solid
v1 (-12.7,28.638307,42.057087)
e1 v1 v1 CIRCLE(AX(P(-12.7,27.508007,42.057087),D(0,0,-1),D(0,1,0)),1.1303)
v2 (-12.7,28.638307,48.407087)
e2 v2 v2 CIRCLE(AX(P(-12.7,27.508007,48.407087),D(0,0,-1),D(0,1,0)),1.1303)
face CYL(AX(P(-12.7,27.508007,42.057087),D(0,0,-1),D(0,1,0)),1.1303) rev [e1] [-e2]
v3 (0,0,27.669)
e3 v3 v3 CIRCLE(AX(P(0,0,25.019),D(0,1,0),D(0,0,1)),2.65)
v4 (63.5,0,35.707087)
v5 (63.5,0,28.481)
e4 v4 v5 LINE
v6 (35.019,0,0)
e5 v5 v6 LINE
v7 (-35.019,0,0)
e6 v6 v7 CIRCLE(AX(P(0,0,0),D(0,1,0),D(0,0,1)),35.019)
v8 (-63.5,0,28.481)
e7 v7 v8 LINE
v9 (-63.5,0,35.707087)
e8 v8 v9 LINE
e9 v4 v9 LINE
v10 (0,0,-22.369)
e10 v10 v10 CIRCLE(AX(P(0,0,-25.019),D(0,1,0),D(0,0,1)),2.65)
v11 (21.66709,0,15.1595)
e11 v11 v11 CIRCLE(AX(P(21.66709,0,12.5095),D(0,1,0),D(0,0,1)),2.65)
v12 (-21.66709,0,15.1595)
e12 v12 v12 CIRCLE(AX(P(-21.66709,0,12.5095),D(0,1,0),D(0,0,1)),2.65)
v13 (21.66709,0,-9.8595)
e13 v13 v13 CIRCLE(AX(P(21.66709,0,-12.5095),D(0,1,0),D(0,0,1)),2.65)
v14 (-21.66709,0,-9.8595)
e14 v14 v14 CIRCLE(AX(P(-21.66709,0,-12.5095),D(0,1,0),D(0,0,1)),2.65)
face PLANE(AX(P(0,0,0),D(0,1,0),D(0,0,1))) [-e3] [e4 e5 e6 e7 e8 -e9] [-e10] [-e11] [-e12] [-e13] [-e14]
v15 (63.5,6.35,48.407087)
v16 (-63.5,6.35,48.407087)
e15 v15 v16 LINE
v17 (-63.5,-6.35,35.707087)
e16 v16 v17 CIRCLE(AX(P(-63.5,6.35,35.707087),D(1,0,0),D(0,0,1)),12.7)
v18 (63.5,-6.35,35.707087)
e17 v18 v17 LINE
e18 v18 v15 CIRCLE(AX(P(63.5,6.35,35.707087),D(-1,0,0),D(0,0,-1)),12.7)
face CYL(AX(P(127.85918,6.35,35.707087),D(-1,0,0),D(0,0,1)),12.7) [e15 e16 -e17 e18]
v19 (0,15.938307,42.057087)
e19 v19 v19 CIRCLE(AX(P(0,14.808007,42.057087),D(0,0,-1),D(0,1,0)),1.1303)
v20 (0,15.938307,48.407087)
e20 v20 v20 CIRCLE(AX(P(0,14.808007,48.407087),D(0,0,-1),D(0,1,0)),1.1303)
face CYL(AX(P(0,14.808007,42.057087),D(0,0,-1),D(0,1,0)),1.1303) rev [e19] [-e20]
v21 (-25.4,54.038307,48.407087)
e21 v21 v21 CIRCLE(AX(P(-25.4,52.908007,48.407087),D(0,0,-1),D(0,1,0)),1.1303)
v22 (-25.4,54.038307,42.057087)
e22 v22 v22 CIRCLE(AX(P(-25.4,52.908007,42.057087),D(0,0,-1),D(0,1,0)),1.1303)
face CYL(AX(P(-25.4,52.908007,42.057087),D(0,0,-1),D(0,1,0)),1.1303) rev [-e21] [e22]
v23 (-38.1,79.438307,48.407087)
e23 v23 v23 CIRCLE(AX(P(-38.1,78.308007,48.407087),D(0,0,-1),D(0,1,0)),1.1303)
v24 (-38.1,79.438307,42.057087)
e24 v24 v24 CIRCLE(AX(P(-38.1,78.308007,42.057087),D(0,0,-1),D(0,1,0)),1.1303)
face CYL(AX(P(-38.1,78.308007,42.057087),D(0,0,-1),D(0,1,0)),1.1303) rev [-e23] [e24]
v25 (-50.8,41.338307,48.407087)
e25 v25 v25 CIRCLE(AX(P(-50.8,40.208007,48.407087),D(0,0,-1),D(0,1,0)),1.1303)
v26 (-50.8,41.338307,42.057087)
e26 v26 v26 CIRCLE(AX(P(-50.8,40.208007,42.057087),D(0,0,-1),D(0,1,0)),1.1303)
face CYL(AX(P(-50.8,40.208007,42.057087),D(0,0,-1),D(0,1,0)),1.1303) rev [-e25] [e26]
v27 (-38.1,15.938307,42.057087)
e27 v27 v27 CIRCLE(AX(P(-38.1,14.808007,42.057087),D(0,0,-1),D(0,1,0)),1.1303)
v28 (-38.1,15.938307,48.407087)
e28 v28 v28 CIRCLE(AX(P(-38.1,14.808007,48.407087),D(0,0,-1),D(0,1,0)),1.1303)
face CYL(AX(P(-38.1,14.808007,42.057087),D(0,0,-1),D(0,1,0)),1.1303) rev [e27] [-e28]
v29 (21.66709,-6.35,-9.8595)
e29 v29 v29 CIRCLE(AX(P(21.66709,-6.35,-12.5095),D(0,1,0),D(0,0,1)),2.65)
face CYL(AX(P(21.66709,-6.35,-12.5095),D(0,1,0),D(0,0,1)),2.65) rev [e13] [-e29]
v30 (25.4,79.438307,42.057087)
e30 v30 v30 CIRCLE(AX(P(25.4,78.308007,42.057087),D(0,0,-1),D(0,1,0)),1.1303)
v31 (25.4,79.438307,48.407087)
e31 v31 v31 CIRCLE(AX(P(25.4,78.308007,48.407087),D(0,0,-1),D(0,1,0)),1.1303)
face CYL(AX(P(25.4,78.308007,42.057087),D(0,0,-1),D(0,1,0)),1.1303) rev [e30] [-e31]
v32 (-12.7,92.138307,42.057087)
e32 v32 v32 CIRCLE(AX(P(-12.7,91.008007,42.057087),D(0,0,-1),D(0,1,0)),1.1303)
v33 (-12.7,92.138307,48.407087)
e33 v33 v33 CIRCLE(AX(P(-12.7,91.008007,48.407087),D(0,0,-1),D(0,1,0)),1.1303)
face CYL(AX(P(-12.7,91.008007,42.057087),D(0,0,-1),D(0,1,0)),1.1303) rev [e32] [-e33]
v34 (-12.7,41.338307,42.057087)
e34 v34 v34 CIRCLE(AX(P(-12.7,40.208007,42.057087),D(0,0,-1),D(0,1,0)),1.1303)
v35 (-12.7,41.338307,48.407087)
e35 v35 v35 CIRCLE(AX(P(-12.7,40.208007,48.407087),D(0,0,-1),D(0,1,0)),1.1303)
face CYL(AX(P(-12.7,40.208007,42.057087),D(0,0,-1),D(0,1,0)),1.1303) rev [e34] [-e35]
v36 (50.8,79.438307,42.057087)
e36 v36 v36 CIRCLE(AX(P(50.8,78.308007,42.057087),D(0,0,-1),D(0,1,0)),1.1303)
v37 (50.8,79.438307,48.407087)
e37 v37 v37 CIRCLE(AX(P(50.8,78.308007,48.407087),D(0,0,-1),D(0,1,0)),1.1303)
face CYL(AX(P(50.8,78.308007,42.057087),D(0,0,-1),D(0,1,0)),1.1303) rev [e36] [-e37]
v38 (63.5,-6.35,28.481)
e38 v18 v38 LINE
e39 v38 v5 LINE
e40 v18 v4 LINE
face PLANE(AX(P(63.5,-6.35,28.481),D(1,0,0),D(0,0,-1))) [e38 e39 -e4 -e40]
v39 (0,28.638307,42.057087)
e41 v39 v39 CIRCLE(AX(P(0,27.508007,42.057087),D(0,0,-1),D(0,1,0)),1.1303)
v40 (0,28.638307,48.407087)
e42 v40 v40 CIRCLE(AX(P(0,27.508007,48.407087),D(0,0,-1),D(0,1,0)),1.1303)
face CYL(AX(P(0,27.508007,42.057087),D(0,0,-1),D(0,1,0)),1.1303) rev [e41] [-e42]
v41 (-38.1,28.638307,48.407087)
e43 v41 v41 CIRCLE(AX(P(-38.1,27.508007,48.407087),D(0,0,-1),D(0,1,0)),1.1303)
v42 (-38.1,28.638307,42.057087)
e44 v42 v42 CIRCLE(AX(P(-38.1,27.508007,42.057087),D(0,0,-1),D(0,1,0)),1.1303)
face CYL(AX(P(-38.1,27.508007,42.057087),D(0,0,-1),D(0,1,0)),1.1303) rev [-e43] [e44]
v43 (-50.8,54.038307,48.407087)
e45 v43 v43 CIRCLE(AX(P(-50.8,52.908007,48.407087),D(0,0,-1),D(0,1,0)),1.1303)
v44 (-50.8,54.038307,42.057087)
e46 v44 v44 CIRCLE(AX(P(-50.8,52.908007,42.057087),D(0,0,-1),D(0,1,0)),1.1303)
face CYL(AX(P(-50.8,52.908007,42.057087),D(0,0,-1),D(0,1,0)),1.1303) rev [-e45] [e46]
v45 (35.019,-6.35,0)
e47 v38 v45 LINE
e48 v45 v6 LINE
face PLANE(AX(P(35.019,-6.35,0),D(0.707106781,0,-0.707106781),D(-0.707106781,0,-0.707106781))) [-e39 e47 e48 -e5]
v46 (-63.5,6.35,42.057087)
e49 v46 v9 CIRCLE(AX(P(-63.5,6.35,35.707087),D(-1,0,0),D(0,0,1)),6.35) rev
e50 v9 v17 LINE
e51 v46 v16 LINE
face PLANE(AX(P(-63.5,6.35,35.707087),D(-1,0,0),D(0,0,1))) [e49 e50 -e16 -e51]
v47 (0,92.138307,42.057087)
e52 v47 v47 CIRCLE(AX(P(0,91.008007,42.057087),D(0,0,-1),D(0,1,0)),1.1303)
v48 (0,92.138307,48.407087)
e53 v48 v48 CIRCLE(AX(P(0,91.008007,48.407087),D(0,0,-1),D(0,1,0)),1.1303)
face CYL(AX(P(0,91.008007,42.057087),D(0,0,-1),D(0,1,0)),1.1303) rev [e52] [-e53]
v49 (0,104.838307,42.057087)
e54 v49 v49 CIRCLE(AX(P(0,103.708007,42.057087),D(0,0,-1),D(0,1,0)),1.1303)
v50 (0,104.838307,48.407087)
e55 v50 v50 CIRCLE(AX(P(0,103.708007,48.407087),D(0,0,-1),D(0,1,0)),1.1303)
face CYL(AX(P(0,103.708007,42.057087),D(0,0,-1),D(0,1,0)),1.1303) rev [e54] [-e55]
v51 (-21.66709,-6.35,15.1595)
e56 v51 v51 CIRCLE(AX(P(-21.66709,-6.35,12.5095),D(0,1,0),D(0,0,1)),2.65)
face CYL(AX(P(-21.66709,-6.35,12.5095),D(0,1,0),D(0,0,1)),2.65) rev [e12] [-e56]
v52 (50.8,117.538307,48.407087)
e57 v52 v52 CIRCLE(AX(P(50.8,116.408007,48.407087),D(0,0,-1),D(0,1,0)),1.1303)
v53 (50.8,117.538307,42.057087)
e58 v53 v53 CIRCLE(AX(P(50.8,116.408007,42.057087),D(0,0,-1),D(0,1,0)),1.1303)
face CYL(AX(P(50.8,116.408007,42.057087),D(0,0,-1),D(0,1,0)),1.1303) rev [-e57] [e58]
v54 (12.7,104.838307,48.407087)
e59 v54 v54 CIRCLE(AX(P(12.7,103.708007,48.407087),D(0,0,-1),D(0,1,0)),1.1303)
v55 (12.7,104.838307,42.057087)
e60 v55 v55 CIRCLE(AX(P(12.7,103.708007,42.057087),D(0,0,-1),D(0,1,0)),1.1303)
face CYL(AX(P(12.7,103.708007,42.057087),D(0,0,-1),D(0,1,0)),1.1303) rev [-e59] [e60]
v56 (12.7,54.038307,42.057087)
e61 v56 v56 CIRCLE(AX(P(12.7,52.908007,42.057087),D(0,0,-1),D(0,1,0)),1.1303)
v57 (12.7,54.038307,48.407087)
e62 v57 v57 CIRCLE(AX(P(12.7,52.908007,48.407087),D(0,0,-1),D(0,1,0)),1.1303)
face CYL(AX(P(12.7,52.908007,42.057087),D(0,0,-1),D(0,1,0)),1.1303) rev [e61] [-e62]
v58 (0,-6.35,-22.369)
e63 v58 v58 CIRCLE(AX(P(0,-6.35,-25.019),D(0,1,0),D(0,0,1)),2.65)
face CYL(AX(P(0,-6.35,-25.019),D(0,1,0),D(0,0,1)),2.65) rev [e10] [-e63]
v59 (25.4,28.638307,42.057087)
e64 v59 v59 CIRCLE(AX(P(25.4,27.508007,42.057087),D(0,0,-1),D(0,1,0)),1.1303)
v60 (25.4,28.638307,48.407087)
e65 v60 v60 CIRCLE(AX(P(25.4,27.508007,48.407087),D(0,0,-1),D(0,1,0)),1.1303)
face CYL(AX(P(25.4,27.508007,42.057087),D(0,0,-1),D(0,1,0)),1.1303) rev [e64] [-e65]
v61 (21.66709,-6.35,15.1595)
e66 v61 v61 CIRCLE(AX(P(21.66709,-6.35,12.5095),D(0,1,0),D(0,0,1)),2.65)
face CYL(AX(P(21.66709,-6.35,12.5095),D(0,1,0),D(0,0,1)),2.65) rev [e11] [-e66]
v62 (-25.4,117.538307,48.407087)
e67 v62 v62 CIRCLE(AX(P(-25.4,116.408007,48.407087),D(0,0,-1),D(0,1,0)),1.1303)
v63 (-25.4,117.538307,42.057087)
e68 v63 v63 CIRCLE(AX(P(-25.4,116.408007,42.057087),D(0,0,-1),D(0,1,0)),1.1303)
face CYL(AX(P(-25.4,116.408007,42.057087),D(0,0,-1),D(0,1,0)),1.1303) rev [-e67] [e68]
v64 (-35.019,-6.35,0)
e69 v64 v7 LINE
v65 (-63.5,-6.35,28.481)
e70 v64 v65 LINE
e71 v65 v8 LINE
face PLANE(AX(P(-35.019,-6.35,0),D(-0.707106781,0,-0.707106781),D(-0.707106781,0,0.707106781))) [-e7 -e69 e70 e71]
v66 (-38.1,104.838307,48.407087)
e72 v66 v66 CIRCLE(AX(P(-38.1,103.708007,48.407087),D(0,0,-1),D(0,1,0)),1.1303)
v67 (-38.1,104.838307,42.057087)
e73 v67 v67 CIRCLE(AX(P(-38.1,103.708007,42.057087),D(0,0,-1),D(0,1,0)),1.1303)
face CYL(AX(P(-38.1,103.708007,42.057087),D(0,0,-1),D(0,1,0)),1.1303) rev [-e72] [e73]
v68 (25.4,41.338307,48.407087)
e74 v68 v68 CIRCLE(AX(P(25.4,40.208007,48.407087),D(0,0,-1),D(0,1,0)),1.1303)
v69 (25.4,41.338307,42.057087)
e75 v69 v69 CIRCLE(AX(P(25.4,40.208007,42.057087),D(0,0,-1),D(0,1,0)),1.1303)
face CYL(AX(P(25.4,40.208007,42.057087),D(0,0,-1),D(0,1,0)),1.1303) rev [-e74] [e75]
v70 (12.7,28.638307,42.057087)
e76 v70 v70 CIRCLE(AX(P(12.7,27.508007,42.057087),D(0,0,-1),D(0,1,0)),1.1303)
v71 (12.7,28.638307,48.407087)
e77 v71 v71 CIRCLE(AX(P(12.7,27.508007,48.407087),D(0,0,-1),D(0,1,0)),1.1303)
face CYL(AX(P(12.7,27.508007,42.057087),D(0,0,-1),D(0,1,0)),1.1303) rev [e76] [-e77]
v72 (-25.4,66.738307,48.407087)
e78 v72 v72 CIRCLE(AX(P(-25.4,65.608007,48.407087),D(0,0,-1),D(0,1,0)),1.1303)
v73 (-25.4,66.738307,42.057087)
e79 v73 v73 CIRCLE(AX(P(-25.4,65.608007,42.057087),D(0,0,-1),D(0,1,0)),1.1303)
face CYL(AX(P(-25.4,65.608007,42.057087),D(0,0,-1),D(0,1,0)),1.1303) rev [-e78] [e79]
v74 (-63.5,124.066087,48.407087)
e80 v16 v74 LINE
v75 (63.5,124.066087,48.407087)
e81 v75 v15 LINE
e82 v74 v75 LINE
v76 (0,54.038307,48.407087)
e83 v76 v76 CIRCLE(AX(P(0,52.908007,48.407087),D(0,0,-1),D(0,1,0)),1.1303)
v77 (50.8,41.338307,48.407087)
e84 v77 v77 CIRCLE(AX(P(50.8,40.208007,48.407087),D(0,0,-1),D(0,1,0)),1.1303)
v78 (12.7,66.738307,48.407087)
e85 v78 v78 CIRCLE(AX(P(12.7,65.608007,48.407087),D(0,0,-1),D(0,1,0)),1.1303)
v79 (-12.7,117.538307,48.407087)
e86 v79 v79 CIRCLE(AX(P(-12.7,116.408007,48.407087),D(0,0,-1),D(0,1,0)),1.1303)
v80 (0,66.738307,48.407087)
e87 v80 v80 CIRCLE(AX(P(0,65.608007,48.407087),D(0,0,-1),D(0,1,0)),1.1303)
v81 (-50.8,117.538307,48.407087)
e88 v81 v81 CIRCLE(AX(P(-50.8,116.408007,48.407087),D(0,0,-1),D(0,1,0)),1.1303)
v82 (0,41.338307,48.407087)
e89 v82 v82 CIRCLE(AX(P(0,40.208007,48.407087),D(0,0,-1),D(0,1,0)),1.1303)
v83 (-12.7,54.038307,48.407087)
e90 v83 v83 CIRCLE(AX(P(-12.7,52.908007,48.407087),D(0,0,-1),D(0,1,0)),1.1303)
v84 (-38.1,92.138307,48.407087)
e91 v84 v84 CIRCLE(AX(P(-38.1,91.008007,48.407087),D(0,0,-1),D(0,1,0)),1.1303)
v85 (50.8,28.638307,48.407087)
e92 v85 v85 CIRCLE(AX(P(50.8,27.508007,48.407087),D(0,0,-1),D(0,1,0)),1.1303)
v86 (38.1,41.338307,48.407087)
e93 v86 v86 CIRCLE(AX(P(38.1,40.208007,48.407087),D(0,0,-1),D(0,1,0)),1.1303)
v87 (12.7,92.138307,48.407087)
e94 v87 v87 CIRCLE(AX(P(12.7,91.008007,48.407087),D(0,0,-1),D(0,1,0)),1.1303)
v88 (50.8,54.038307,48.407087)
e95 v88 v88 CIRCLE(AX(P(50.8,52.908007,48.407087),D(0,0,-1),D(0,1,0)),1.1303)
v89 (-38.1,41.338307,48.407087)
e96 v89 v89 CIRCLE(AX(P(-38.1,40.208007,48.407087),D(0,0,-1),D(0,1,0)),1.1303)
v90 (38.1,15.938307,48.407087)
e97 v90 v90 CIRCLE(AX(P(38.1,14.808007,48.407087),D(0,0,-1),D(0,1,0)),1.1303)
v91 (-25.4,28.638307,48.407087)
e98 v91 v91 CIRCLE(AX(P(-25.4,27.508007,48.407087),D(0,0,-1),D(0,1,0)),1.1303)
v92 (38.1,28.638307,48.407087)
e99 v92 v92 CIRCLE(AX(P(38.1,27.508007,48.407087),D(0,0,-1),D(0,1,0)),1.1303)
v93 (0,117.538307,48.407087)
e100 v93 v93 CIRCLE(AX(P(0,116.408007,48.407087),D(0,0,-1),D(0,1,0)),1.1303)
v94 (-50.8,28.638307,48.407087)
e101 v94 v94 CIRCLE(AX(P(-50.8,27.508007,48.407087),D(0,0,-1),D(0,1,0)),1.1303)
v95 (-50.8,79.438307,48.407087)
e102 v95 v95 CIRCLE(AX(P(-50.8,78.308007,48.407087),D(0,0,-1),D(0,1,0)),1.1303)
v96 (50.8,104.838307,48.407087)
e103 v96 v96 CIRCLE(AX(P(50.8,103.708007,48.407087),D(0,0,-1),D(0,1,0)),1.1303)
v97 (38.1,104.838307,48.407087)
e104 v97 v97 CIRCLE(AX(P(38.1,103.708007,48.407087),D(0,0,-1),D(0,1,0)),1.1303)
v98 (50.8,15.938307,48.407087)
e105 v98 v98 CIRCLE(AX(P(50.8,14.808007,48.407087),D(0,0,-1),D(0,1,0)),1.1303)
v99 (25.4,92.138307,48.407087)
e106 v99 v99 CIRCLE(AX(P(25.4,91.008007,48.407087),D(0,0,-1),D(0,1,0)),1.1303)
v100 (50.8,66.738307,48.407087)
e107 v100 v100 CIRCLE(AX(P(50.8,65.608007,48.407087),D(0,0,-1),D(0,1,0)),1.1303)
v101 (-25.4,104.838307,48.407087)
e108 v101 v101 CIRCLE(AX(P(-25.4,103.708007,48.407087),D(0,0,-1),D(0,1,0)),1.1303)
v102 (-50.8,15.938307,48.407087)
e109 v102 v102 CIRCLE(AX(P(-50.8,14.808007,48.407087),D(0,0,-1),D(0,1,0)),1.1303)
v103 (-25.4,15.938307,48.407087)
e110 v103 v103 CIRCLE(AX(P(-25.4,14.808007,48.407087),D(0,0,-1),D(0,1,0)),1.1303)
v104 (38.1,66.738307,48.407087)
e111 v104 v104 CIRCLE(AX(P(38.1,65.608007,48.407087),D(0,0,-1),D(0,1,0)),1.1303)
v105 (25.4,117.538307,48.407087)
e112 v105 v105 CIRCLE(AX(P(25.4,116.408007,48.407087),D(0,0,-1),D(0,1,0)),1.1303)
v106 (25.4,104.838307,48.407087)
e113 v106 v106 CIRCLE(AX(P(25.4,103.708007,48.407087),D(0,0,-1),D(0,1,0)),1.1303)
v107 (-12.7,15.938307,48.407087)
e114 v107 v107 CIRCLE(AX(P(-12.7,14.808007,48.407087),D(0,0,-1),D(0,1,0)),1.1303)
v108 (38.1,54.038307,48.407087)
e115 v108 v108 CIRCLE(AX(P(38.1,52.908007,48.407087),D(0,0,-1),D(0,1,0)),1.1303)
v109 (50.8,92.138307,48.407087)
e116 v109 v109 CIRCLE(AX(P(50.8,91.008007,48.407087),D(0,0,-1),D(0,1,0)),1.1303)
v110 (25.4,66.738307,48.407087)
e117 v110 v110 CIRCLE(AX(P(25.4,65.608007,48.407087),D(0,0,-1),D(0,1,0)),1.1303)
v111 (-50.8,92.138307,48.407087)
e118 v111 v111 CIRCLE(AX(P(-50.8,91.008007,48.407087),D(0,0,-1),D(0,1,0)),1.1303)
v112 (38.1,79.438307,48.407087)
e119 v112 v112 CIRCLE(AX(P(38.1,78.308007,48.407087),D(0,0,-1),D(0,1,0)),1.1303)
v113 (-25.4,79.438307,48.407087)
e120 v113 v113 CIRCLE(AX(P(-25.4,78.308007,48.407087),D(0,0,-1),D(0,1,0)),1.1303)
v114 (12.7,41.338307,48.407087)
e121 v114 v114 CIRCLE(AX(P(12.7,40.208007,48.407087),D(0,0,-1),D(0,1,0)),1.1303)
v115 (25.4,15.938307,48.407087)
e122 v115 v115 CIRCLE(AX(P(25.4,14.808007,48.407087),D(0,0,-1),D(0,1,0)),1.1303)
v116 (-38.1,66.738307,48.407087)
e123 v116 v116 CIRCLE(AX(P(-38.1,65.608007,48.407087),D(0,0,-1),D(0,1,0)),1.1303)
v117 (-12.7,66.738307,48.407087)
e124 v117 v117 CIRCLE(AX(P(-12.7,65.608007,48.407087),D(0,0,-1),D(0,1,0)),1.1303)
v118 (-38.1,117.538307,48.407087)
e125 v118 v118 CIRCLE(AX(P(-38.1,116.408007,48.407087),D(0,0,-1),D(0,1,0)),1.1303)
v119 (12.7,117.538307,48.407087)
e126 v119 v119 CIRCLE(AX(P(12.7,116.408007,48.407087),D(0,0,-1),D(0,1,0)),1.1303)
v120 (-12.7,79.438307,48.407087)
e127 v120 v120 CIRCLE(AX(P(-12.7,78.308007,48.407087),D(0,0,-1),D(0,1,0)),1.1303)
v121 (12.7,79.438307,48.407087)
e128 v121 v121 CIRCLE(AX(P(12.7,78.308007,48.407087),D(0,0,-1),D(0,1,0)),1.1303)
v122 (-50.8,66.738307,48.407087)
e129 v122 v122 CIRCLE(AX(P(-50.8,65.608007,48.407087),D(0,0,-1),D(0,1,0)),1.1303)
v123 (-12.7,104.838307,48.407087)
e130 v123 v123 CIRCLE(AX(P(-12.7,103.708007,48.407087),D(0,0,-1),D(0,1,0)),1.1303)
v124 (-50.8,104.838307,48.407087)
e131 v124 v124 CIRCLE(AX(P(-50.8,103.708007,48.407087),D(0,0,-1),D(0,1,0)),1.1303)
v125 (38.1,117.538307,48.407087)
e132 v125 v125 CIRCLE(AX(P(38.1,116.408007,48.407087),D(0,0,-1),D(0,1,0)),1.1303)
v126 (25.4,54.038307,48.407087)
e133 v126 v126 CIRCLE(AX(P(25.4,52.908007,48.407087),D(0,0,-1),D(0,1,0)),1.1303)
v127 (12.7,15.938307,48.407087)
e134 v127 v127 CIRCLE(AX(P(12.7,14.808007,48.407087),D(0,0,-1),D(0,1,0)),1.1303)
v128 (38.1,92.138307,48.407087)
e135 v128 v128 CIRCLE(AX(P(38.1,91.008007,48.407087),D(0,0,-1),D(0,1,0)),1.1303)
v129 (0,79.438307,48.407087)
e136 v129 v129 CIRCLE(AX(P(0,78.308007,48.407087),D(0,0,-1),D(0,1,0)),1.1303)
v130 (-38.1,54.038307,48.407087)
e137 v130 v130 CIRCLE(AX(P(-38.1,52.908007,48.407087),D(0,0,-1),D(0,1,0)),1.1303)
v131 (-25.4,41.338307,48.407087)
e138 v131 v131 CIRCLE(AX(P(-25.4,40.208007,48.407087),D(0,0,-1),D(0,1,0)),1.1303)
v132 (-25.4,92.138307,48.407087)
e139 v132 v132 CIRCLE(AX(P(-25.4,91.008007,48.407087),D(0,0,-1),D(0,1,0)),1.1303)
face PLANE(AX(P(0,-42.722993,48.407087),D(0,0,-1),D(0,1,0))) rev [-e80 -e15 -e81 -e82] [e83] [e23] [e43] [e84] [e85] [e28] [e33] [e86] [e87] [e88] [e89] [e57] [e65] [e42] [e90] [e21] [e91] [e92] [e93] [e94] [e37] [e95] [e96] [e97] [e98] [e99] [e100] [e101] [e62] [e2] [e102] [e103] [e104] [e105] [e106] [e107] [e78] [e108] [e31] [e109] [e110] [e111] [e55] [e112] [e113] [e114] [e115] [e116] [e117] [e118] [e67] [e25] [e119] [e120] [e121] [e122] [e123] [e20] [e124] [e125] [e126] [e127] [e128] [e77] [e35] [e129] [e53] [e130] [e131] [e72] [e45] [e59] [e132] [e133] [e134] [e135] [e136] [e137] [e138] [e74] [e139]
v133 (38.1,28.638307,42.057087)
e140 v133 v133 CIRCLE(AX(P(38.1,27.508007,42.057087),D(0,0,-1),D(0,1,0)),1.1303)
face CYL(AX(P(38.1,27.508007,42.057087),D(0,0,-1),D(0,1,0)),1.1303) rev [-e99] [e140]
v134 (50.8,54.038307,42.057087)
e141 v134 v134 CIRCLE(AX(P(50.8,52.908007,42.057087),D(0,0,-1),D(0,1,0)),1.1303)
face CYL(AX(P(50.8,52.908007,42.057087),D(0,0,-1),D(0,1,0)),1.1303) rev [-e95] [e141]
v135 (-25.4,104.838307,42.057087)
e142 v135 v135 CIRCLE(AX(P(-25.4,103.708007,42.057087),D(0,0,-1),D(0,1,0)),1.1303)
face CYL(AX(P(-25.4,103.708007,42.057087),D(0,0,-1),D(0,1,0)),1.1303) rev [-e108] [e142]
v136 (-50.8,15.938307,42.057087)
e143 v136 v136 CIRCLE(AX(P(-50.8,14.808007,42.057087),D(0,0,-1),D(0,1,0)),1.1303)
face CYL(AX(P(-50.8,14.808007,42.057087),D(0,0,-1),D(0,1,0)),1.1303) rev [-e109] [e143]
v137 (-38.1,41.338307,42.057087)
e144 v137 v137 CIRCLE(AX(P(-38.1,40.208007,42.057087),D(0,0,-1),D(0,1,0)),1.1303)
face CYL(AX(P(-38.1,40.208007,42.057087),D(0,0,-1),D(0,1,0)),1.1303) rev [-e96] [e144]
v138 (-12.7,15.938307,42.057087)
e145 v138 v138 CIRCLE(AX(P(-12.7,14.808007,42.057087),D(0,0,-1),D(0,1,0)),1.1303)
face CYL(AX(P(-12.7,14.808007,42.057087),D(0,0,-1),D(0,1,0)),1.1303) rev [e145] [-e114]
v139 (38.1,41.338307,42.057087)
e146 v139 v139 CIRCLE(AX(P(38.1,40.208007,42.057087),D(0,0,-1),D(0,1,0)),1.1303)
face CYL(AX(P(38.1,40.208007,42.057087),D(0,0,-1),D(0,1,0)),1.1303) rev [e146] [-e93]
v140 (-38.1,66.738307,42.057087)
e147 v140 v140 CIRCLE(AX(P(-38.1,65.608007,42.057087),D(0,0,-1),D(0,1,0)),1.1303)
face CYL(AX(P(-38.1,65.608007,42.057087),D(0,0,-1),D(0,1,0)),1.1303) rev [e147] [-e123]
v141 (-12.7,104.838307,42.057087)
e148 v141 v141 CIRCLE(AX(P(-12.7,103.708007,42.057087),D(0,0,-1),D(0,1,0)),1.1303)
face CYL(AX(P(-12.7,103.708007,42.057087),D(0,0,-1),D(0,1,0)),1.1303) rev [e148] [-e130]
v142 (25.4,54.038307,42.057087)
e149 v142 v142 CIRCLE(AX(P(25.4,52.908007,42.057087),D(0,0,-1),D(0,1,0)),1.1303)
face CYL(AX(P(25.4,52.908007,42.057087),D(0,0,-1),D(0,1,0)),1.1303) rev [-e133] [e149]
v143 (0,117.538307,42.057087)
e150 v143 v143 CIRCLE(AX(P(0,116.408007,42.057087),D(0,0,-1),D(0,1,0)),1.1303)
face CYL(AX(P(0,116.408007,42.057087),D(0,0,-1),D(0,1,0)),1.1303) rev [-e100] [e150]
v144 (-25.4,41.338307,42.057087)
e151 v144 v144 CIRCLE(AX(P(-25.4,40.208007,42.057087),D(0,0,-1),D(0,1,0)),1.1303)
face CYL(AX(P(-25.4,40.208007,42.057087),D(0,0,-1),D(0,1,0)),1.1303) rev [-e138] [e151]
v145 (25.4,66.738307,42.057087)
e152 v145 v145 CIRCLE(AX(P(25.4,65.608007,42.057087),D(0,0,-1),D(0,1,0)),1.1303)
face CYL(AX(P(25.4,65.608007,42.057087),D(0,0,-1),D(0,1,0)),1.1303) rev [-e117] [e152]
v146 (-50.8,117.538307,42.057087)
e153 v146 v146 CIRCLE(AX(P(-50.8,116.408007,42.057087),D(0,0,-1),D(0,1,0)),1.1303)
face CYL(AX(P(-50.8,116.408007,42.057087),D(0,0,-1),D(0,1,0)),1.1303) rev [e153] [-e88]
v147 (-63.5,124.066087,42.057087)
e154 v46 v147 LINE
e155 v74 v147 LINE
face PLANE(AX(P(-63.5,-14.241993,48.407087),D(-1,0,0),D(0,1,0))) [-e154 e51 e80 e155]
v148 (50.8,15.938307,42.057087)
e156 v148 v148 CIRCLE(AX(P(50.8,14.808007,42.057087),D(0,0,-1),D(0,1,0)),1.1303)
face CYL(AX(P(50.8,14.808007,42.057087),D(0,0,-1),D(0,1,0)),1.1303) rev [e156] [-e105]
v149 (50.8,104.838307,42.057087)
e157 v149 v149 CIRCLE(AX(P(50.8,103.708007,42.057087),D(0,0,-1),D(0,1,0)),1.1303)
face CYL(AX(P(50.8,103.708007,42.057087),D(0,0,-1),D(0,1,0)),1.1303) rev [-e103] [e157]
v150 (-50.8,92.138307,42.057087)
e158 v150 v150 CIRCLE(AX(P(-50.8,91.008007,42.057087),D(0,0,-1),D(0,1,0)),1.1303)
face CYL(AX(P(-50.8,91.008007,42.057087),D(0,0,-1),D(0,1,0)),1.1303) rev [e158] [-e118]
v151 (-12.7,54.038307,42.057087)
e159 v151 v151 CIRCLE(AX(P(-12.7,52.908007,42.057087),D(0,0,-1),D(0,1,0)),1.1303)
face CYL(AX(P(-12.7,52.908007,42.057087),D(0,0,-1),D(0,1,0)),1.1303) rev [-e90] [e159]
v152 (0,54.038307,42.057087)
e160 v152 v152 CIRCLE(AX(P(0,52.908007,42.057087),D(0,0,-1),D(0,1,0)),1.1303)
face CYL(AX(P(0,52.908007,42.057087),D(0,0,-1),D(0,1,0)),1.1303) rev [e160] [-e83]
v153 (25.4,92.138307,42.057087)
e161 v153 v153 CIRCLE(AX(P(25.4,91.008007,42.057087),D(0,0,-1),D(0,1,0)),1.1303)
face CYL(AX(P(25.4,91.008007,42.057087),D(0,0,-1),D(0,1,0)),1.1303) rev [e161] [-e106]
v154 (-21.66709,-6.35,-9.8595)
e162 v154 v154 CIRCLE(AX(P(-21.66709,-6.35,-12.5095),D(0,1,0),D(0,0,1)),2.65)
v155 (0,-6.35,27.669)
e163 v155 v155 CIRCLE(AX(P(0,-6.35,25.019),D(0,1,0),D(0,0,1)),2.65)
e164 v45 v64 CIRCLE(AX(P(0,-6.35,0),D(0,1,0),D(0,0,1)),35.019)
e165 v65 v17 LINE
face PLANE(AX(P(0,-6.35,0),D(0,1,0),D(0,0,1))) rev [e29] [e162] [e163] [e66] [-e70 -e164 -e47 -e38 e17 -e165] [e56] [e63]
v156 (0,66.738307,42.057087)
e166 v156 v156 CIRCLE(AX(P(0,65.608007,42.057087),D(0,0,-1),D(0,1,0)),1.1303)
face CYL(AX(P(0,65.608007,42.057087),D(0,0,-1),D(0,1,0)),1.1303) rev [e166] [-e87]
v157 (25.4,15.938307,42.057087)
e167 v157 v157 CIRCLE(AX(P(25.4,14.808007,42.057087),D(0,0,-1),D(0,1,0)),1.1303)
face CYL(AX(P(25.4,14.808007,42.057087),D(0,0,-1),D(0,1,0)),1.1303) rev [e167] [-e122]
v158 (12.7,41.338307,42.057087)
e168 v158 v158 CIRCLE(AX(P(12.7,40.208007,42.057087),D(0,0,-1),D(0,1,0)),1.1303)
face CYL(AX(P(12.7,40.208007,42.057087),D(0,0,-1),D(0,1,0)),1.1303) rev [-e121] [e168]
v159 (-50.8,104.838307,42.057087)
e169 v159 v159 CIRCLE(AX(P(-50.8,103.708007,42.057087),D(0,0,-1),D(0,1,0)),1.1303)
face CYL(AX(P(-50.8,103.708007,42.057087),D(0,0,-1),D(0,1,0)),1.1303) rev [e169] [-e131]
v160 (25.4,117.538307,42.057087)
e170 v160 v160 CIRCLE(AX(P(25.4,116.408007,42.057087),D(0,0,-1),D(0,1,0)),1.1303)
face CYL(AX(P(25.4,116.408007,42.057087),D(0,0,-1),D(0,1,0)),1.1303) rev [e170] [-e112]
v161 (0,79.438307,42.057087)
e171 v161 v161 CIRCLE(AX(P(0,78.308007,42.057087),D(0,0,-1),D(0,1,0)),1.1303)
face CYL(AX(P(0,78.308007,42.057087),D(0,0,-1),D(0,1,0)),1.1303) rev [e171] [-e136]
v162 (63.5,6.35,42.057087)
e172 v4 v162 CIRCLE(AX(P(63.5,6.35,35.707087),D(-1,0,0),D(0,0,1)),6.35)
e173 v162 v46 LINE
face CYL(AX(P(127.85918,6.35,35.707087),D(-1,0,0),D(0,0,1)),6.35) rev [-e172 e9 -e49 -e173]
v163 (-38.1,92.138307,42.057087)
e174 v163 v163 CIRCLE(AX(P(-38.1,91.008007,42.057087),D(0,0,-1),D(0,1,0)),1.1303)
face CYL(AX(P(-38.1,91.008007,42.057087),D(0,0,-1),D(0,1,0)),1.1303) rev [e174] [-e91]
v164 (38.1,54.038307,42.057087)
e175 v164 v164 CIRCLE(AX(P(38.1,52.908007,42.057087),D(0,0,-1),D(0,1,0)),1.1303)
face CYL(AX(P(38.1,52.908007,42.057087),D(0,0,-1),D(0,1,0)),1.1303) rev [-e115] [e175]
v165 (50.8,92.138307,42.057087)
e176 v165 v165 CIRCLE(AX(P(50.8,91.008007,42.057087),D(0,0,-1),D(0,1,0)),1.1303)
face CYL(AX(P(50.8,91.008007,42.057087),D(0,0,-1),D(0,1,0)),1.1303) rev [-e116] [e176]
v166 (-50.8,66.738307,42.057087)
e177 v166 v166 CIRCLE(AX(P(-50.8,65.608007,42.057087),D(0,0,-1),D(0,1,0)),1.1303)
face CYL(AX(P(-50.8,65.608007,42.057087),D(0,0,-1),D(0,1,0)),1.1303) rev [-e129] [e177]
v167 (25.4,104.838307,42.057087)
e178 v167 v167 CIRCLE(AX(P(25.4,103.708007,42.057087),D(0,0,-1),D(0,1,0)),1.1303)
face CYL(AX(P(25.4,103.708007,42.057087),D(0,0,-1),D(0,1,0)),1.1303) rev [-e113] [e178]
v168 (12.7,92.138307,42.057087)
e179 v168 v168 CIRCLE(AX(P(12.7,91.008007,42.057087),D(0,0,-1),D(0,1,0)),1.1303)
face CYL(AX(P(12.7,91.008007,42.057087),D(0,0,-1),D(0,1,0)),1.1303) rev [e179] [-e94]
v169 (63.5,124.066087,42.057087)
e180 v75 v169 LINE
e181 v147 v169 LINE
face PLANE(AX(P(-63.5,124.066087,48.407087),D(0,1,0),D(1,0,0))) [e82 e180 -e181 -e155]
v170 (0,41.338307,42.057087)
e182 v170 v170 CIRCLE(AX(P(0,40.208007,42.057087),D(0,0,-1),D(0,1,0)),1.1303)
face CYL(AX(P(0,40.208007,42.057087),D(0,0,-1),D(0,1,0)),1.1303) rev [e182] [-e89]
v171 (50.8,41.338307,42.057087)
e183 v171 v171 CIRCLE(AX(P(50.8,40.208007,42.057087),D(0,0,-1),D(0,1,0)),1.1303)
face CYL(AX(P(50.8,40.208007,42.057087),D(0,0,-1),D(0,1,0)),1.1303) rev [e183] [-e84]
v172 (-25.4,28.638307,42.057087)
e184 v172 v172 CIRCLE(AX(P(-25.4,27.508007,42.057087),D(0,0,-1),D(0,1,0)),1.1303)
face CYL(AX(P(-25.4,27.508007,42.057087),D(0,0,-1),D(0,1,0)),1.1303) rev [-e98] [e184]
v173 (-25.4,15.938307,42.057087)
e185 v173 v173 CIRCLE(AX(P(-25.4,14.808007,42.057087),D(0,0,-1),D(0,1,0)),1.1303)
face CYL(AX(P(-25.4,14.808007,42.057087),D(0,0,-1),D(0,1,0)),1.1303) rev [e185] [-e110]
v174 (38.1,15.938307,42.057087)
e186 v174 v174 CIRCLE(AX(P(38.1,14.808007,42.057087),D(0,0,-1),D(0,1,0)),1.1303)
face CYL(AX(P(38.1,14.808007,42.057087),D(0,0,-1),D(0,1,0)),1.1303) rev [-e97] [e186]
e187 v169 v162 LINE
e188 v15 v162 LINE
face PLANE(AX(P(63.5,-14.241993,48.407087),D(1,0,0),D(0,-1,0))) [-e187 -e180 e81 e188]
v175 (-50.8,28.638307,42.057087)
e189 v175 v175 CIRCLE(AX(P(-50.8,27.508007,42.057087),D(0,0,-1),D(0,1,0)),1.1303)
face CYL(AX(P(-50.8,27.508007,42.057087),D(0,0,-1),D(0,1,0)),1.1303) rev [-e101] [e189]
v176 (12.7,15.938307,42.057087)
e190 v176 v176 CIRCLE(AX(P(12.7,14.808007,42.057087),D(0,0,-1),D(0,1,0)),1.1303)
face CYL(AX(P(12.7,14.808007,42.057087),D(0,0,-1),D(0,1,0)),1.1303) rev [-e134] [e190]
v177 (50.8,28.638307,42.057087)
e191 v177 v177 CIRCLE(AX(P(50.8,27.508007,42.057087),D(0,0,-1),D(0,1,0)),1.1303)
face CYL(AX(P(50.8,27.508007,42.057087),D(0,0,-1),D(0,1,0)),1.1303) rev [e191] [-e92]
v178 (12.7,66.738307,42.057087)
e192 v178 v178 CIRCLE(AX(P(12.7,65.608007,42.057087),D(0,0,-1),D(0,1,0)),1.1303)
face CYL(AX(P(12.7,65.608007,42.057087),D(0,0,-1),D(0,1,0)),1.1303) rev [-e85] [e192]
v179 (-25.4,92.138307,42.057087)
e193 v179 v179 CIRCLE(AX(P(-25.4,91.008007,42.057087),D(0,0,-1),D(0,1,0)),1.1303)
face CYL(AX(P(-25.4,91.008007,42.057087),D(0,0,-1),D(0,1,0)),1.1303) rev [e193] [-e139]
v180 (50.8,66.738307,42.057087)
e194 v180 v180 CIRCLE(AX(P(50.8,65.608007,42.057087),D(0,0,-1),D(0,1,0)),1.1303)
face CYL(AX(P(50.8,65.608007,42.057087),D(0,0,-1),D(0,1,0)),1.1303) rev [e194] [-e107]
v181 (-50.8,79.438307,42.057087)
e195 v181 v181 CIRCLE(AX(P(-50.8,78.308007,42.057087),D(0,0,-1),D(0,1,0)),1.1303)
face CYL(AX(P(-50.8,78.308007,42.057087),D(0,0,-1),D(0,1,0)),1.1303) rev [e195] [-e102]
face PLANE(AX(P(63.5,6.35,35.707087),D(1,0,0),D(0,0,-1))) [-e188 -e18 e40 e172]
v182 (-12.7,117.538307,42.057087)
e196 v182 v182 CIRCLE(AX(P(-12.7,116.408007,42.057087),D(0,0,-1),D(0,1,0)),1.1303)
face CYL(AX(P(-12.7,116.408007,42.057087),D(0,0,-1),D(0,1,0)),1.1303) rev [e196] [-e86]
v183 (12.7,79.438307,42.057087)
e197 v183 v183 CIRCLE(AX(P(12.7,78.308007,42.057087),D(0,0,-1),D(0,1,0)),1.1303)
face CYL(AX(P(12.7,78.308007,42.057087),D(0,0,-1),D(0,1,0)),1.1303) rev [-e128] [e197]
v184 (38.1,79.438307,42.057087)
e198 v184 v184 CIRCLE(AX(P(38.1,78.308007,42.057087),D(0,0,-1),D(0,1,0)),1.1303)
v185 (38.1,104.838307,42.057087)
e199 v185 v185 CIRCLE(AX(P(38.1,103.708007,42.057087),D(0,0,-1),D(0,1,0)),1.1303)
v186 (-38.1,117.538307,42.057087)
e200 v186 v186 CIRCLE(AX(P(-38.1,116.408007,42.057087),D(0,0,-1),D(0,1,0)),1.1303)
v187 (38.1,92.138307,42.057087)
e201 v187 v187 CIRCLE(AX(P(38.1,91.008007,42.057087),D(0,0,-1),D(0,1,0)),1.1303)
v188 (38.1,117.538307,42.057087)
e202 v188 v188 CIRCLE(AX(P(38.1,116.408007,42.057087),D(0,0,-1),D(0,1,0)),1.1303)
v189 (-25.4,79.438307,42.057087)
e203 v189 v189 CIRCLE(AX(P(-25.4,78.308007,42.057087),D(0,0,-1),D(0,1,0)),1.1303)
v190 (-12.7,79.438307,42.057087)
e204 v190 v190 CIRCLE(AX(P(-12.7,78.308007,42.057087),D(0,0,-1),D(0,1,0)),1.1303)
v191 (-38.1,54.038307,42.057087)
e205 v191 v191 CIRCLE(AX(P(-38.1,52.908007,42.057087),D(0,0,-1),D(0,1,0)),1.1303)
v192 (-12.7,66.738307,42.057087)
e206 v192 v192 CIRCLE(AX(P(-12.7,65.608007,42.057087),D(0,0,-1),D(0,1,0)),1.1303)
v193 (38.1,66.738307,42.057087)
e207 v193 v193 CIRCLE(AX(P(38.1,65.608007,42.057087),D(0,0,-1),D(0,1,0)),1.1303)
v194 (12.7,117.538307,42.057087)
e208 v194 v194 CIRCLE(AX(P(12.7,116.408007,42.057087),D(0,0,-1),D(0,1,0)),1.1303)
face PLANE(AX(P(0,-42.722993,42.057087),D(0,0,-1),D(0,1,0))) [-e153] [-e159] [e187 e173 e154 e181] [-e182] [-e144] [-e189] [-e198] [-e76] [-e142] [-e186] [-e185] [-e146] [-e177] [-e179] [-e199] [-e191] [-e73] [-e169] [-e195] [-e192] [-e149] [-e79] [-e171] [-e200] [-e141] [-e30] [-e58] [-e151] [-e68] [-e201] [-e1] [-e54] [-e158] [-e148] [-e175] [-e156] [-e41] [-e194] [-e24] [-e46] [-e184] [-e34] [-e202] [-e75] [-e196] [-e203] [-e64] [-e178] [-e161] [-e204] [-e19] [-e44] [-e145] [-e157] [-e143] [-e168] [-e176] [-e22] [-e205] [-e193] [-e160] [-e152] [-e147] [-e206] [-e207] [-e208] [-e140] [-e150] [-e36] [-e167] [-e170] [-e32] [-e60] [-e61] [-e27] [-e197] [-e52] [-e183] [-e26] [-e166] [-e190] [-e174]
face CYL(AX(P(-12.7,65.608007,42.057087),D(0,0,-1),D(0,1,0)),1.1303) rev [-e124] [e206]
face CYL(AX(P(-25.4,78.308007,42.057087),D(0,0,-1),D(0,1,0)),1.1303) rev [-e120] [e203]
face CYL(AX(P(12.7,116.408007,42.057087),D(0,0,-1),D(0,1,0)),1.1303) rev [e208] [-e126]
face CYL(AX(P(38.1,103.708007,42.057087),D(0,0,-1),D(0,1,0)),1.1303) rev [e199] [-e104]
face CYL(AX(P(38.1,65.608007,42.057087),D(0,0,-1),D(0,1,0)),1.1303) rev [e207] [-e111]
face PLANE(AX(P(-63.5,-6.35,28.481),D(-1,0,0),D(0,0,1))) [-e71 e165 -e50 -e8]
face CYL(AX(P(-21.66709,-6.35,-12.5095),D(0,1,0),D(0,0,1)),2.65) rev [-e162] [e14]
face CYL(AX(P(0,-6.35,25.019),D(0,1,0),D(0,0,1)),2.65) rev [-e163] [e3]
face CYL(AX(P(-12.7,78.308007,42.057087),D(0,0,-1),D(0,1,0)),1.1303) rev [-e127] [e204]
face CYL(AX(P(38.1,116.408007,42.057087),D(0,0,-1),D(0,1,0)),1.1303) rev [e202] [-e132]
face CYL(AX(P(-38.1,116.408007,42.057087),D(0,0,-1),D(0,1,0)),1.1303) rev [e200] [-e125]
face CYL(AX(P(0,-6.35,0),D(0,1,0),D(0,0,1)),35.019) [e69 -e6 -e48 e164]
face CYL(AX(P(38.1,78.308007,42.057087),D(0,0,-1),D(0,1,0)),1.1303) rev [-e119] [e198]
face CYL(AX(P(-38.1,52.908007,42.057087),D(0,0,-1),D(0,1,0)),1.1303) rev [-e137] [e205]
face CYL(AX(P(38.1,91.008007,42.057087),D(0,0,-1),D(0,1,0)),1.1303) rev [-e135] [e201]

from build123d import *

# Parameters (mm, degrees)
SKETCH3_R                  = 2.65
BASE_FLANGE1_DEPTH         = 6.35
F_4_40_TAPPED_HOLE1_D      = 2.2606
LPATTERN1_COUNT            = 9
LPATTERN1_PITCH            = 12.7
LPATTERN1_COUNT_DIR2       = 9
LPATTERN1_PITCH_DIR2       = 12.7
SKETCHED_START             = 47.102289028
SKETCHED_BEND1_OUTLINE_W   = 127
SKETCHED_BEND1_OUTLINE_H   = 6.35
SKETCHED_BEND1_DEPTH       = 119.686790972
SKETCHED_START_2           = 35.707087028
SKETCHED_BEND1_2_OUTLINE_W = 127
SKETCHED_BEND1_2_OUTLINE_H = 124.066087028
SKETCHED_BEND1_2_OUTLINE_R = 1.1303
SKETCHED_BEND1_2_DEPTH     = 12.7
SKETCHED_START_3           = -63.5
SKETCHED_BEND1_3_DEPTH     = 127


with BuildPart() as part:
    # Base-Flange1: sheet metal written as solids
    # Sketch3 → Base-Flange1 (new body)
    with BuildSketch(Plane(origin=(0, 0, 0), x_dir=(1, 0, 0), z_dir=(0, 1, 0))):
        with BuildLine():
            Line((-63.5, -28.481), (-63.5, -166.78908))
            Line((-63.5, -166.78908), (63.5, -166.78908))
            Line((63.5, -166.78908), (63.5, -28.481))
            Line((63.5, -28.481), (35.019, 0))
            ThreePointArc((35.019, 0), (0, 35.019), (-35.019, 0))
            Line((-35.019, 0), (-63.5, -28.481))
        make_face()
        with Locations(Location((0, 25.019, 0), (0, 0, 270))):
            Circle(SKETCH3_R, mode=Mode.SUBTRACT)
        with Locations(Location((21.667089577, 12.5095, 0), (0, 0, 270))):
            Circle(SKETCH3_R, mode=Mode.SUBTRACT)
        with Locations(Location((21.667089577, -12.5095, 0), (0, 0, 270))):
            Circle(SKETCH3_R, mode=Mode.SUBTRACT)
        with Locations(Location((0, -25.019, 0), (0, 0, 270))):
            Circle(SKETCH3_R, mode=Mode.SUBTRACT)
        with Locations(Location((-21.667089577, -12.5095, 0), (0, 0, 270))):
            Circle(SKETCH3_R, mode=Mode.SUBTRACT)
        with Locations(Location((-21.667089577, 12.5095, 0), (0, 0, 270))):
            Circle(SKETCH3_R, mode=Mode.SUBTRACT)
    extrude(amount=-BASE_FLANGE1_DEPTH)

    # #4-40 Tapped Hole1 (through all)
    with Locations(Plane(origin=(-50.8, 0, 57.531), x_dir=(0, 0, 1), z_dir=(0, 1, 0))):
        with Locations((0, 0)):
            f_4_40_tapped_hole1 = Hole(F_4_40_TAPPED_HOLE1_D / 2)

    # LPattern1: 4-40 Tapped Hole1 9 × 9
    with Locations(*[(i * LPATTERN1_PITCH, 0, j * LPATTERN1_PITCH_DIR2) for i in range(LPATTERN1_COUNT) for j in range(LPATTERN1_COUNT_DIR2) if (i, j) != (0, 0)]):
        add(f_4_40_tapped_hole1, mode=Mode.SUBTRACT)

    # Sketched Bend1: read off the stored shape, not the designer's step
    # Sketched Bend1 outline → Sketched Bend1 (cut)
    with BuildSketch(Plane.XY.offset(SKETCHED_START)):
        with Locations((0, -3.175)):
            Rectangle(SKETCHED_BEND1_OUTLINE_W, SKETCHED_BEND1_OUTLINE_H)
    extrude(amount=SKETCHED_BEND1_DEPTH, mode=Mode.SUBTRACT)

    # Sketched Bend1 2 outline → Sketched Bend1 2 (add)
    with BuildSketch(Plane.XY.offset(SKETCHED_START_2)):
        with Locations((0, 62.033043514)):
            Rectangle(SKETCHED_BEND1_2_OUTLINE_W, SKETCHED_BEND1_2_OUTLINE_H)
        with Locations((-50.8, 14.808007028)):
            Circle(SKETCHED_BEND1_2_OUTLINE_R, mode=Mode.SUBTRACT)
        with Locations((-38.1, 14.808007028)):
            Circle(SKETCHED_BEND1_2_OUTLINE_R, mode=Mode.SUBTRACT)
        with Locations((-25.4, 14.808007028)):
            Circle(SKETCHED_BEND1_2_OUTLINE_R, mode=Mode.SUBTRACT)
        with Locations((-12.7, 14.808007028)):
            Circle(SKETCHED_BEND1_2_OUTLINE_R, mode=Mode.SUBTRACT)
        with Locations((-50.8, 27.508007028)):
            Circle(SKETCHED_BEND1_2_OUTLINE_R, mode=Mode.SUBTRACT)
        with Locations((-50.8, 40.208007028)):
            Circle(SKETCHED_BEND1_2_OUTLINE_R, mode=Mode.SUBTRACT)
        with Locations((-38.1, 27.508007028)):
            Circle(SKETCHED_BEND1_2_OUTLINE_R, mode=Mode.SUBTRACT)
        with Locations((-38.1, 40.208007028)):
            Circle(SKETCHED_BEND1_2_OUTLINE_R, mode=Mode.SUBTRACT)
        with Locations((-50.8, 52.908007028)):
            Circle(SKETCHED_BEND1_2_OUTLINE_R, mode=Mode.SUBTRACT)
        with Locations((-38.1, 52.908007028)):
            Circle(SKETCHED_BEND1_2_OUTLINE_R, mode=Mode.SUBTRACT)
        with Locations((-25.4, 27.508007028)):
            Circle(SKETCHED_BEND1_2_OUTLINE_R, mode=Mode.SUBTRACT)
        with Locations((-25.4, 40.208007028)):
            Circle(SKETCHED_BEND1_2_OUTLINE_R, mode=Mode.SUBTRACT)
        with Locations((-12.7, 27.508007028)):
            Circle(SKETCHED_BEND1_2_OUTLINE_R, mode=Mode.SUBTRACT)
        with Locations((-12.7, 40.208007028)):
            Circle(SKETCHED_BEND1_2_OUTLINE_R, mode=Mode.SUBTRACT)
        with Locations((-25.4, 52.908007028)):
            Circle(SKETCHED_BEND1_2_OUTLINE_R, mode=Mode.SUBTRACT)
        with Locations((-12.7, 52.908007028)):
            Circle(SKETCHED_BEND1_2_OUTLINE_R, mode=Mode.SUBTRACT)
        with Locations((0, 14.808007028)):
            Circle(SKETCHED_BEND1_2_OUTLINE_R, mode=Mode.SUBTRACT)
        with Locations((12.7, 14.808007028)):
            Circle(SKETCHED_BEND1_2_OUTLINE_R, mode=Mode.SUBTRACT)
        with Locations((25.4, 14.808007028)):
            Circle(SKETCHED_BEND1_2_OUTLINE_R, mode=Mode.SUBTRACT)
        with Locations((38.1, 14.808007028)):
            Circle(SKETCHED_BEND1_2_OUTLINE_R, mode=Mode.SUBTRACT)
        with Locations((50.8, 14.808007028)):
            Circle(SKETCHED_BEND1_2_OUTLINE_R, mode=Mode.SUBTRACT)
        with Locations((0, 27.508007028)):
            Circle(SKETCHED_BEND1_2_OUTLINE_R, mode=Mode.SUBTRACT)
        with Locations((12.7, 27.508007028)):
            Circle(SKETCHED_BEND1_2_OUTLINE_R, mode=Mode.SUBTRACT)
        with Locations((0, 40.208007028)):
            Circle(SKETCHED_BEND1_2_OUTLINE_R, mode=Mode.SUBTRACT)
        with Locations((12.7, 40.208007028)):
            Circle(SKETCHED_BEND1_2_OUTLINE_R, mode=Mode.SUBTRACT)
        with Locations((25.4, 27.508007028)):
            Circle(SKETCHED_BEND1_2_OUTLINE_R, mode=Mode.SUBTRACT)
        with Locations((25.4, 40.208007028)):
            Circle(SKETCHED_BEND1_2_OUTLINE_R, mode=Mode.SUBTRACT)
        with Locations((0, 52.908007028)):
            Circle(SKETCHED_BEND1_2_OUTLINE_R, mode=Mode.SUBTRACT)
        with Locations((12.7, 52.908007028)):
            Circle(SKETCHED_BEND1_2_OUTLINE_R, mode=Mode.SUBTRACT)
        with Locations((25.4, 52.908007028)):
            Circle(SKETCHED_BEND1_2_OUTLINE_R, mode=Mode.SUBTRACT)
        with Locations((38.1, 27.508007028)):
            Circle(SKETCHED_BEND1_2_OUTLINE_R, mode=Mode.SUBTRACT)
        with Locations((38.1, 40.208007028)):
            Circle(SKETCHED_BEND1_2_OUTLINE_R, mode=Mode.SUBTRACT)
        with Locations((50.8, 27.508007028)):
            Circle(SKETCHED_BEND1_2_OUTLINE_R, mode=Mode.SUBTRACT)
        with Locations((50.8, 40.208007028)):
            Circle(SKETCHED_BEND1_2_OUTLINE_R, mode=Mode.SUBTRACT)
        with Locations((38.1, 52.908007028)):
            Circle(SKETCHED_BEND1_2_OUTLINE_R, mode=Mode.SUBTRACT)
        with Locations((50.8, 52.908007028)):
            Circle(SKETCHED_BEND1_2_OUTLINE_R, mode=Mode.SUBTRACT)
        with Locations((-50.8, 65.608007028)):
            Circle(SKETCHED_BEND1_2_OUTLINE_R, mode=Mode.SUBTRACT)
        with Locations((-38.1, 65.608007028)):
            Circle(SKETCHED_BEND1_2_OUTLINE_R, mode=Mode.SUBTRACT)
        with Locations((-50.8, 78.308007028)):
            Circle(SKETCHED_BEND1_2_OUTLINE_R, mode=Mode.SUBTRACT)
        with Locations((-50.8, 91.008007028)):
            Circle(SKETCHED_BEND1_2_OUTLINE_R, mode=Mode.SUBTRACT)
        with Locations((-38.1, 78.308007028)):
            Circle(SKETCHED_BEND1_2_OUTLINE_R, mode=Mode.SUBTRACT)
        with Locations((-38.1, 91.008007028)):
            Circle(SKETCHED_BEND1_2_OUTLINE_R, mode=Mode.SUBTRACT)
        with Locations((-25.4, 65.608007028)):
            Circle(SKETCHED_BEND1_2_OUTLINE_R, mode=Mode.SUBTRACT)
        with Locations((-12.7, 65.608007028)):
            Circle(SKETCHED_BEND1_2_OUTLINE_R, mode=Mode.SUBTRACT)
        with Locations((-25.4, 78.308007028)):
            Circle(SKETCHED_BEND1_2_OUTLINE_R, mode=Mode.SUBTRACT)
        with Locations((-25.4, 91.008007028)):
            Circle(SKETCHED_BEND1_2_OUTLINE_R, mode=Mode.SUBTRACT)
        with Locations((-12.7, 78.308007028)):
            Circle(SKETCHED_BEND1_2_OUTLINE_R, mode=Mode.SUBTRACT)
        with Locations((-12.7, 91.008007028)):
            Circle(SKETCHED_BEND1_2_OUTLINE_R, mode=Mode.SUBTRACT)
        with Locations((-50.8, 103.708007028)):
            Circle(SKETCHED_BEND1_2_OUTLINE_R, mode=Mode.SUBTRACT)
        with Locations((-38.1, 103.708007028)):
            Circle(SKETCHED_BEND1_2_OUTLINE_R, mode=Mode.SUBTRACT)
        with Locations((-50.8, 116.408007028)):
            Circle(SKETCHED_BEND1_2_OUTLINE_R, mode=Mode.SUBTRACT)
        with Locations((-38.1, 116.408007028)):
            Circle(SKETCHED_BEND1_2_OUTLINE_R, mode=Mode.SUBTRACT)
        with Locations((-25.4, 103.708007028)):
            Circle(SKETCHED_BEND1_2_OUTLINE_R, mode=Mode.SUBTRACT)
        with Locations((-12.7, 103.708007028)):
            Circle(SKETCHED_BEND1_2_OUTLINE_R, mode=Mode.SUBTRACT)
        with Locations((-25.4, 116.408007028)):
            Circle(SKETCHED_BEND1_2_OUTLINE_R, mode=Mode.SUBTRACT)
        with Locations((-12.7, 116.408007028)):
            Circle(SKETCHED_BEND1_2_OUTLINE_R, mode=Mode.SUBTRACT)
        with Locations((0, 65.608007028)):
            Circle(SKETCHED_BEND1_2_OUTLINE_R, mode=Mode.SUBTRACT)
        with Locations((12.7, 65.608007028)):
            Circle(SKETCHED_BEND1_2_OUTLINE_R, mode=Mode.SUBTRACT)
        with Locations((25.4, 65.608007028)):
            Circle(SKETCHED_BEND1_2_OUTLINE_R, mode=Mode.SUBTRACT)
        with Locations((0, 78.308007028)):
            Circle(SKETCHED_BEND1_2_OUTLINE_R, mode=Mode.SUBTRACT)
        with Locations((12.7, 78.308007028)):
            Circle(SKETCHED_BEND1_2_OUTLINE_R, mode=Mode.SUBTRACT)
        with Locations((0, 91.008007028)):
            Circle(SKETCHED_BEND1_2_OUTLINE_R, mode=Mode.SUBTRACT)
        with Locations((12.7, 91.008007028)):
            Circle(SKETCHED_BEND1_2_OUTLINE_R, mode=Mode.SUBTRACT)
        with Locations((25.4, 78.308007028)):
            Circle(SKETCHED_BEND1_2_OUTLINE_R, mode=Mode.SUBTRACT)
        with Locations((25.4, 91.008007028)):
            Circle(SKETCHED_BEND1_2_OUTLINE_R, mode=Mode.SUBTRACT)
        with Locations((38.1, 65.608007028)):
            Circle(SKETCHED_BEND1_2_OUTLINE_R, mode=Mode.SUBTRACT)
        with Locations((50.8, 65.608007028)):
            Circle(SKETCHED_BEND1_2_OUTLINE_R, mode=Mode.SUBTRACT)
        with Locations((38.1, 78.308007028)):
            Circle(SKETCHED_BEND1_2_OUTLINE_R, mode=Mode.SUBTRACT)
        with Locations((38.1, 91.008007028)):
            Circle(SKETCHED_BEND1_2_OUTLINE_R, mode=Mode.SUBTRACT)
        with Locations((50.8, 78.308007028)):
            Circle(SKETCHED_BEND1_2_OUTLINE_R, mode=Mode.SUBTRACT)
        with Locations((50.8, 91.008007028)):
            Circle(SKETCHED_BEND1_2_OUTLINE_R, mode=Mode.SUBTRACT)
        with Locations((0, 103.708007028)):
            Circle(SKETCHED_BEND1_2_OUTLINE_R, mode=Mode.SUBTRACT)
        with Locations((12.7, 103.708007028)):
            Circle(SKETCHED_BEND1_2_OUTLINE_R, mode=Mode.SUBTRACT)
        with Locations((25.4, 103.708007028)):
            Circle(SKETCHED_BEND1_2_OUTLINE_R, mode=Mode.SUBTRACT)
        with Locations((0, 116.408007028)):
            Circle(SKETCHED_BEND1_2_OUTLINE_R, mode=Mode.SUBTRACT)
        with Locations((12.7, 116.408007028)):
            Circle(SKETCHED_BEND1_2_OUTLINE_R, mode=Mode.SUBTRACT)
        with Locations((25.4, 116.408007028)):
            Circle(SKETCHED_BEND1_2_OUTLINE_R, mode=Mode.SUBTRACT)
        with Locations((38.1, 103.708007028)):
            Circle(SKETCHED_BEND1_2_OUTLINE_R, mode=Mode.SUBTRACT)
        with Locations((50.8, 103.708007028)):
            Circle(SKETCHED_BEND1_2_OUTLINE_R, mode=Mode.SUBTRACT)
        with Locations((38.1, 116.408007028)):
            Circle(SKETCHED_BEND1_2_OUTLINE_R, mode=Mode.SUBTRACT)
        with Locations((50.8, 116.408007028)):
            Circle(SKETCHED_BEND1_2_OUTLINE_R, mode=Mode.SUBTRACT)
    extrude(amount=SKETCHED_BEND1_2_DEPTH)

    # Sketched Bend1 3 outline → Sketched Bend1 3 (cut)
    with BuildSketch(Plane.YZ.offset(SKETCHED_START_3)):
        with BuildLine():
            ThreePointArc((-6.35, 35.707087028), (-2.630256121, 44.687343149), (6.35, 48.407087028))
            Line((6.35, 48.407087028), (0, 48.407087028))
            Line((0, 48.407087028), (0, 47.102289028))
            Line((0, 47.102289028), (-6.35, 47.102289028))
            Line((-6.35, 47.102289028), (-6.35, 35.707087028))
        make_face()
        with BuildLine():
            Line((124.066087028, 42.057087028), (6.35, 42.057087028))
            ThreePointArc((6.35, 42.057087028), (1.859871939, 40.197215088), (0, 35.707087028))
            Line((0, 35.707087028), (124.066087028, 35.707087028))
            Line((124.066087028, 35.707087028), (124.066087028, 42.057087028))
        make_face()
    extrude(amount=SKETCHED_BEND1_3_DEPTH, mode=Mode.SUBTRACT)


solid = part.part
